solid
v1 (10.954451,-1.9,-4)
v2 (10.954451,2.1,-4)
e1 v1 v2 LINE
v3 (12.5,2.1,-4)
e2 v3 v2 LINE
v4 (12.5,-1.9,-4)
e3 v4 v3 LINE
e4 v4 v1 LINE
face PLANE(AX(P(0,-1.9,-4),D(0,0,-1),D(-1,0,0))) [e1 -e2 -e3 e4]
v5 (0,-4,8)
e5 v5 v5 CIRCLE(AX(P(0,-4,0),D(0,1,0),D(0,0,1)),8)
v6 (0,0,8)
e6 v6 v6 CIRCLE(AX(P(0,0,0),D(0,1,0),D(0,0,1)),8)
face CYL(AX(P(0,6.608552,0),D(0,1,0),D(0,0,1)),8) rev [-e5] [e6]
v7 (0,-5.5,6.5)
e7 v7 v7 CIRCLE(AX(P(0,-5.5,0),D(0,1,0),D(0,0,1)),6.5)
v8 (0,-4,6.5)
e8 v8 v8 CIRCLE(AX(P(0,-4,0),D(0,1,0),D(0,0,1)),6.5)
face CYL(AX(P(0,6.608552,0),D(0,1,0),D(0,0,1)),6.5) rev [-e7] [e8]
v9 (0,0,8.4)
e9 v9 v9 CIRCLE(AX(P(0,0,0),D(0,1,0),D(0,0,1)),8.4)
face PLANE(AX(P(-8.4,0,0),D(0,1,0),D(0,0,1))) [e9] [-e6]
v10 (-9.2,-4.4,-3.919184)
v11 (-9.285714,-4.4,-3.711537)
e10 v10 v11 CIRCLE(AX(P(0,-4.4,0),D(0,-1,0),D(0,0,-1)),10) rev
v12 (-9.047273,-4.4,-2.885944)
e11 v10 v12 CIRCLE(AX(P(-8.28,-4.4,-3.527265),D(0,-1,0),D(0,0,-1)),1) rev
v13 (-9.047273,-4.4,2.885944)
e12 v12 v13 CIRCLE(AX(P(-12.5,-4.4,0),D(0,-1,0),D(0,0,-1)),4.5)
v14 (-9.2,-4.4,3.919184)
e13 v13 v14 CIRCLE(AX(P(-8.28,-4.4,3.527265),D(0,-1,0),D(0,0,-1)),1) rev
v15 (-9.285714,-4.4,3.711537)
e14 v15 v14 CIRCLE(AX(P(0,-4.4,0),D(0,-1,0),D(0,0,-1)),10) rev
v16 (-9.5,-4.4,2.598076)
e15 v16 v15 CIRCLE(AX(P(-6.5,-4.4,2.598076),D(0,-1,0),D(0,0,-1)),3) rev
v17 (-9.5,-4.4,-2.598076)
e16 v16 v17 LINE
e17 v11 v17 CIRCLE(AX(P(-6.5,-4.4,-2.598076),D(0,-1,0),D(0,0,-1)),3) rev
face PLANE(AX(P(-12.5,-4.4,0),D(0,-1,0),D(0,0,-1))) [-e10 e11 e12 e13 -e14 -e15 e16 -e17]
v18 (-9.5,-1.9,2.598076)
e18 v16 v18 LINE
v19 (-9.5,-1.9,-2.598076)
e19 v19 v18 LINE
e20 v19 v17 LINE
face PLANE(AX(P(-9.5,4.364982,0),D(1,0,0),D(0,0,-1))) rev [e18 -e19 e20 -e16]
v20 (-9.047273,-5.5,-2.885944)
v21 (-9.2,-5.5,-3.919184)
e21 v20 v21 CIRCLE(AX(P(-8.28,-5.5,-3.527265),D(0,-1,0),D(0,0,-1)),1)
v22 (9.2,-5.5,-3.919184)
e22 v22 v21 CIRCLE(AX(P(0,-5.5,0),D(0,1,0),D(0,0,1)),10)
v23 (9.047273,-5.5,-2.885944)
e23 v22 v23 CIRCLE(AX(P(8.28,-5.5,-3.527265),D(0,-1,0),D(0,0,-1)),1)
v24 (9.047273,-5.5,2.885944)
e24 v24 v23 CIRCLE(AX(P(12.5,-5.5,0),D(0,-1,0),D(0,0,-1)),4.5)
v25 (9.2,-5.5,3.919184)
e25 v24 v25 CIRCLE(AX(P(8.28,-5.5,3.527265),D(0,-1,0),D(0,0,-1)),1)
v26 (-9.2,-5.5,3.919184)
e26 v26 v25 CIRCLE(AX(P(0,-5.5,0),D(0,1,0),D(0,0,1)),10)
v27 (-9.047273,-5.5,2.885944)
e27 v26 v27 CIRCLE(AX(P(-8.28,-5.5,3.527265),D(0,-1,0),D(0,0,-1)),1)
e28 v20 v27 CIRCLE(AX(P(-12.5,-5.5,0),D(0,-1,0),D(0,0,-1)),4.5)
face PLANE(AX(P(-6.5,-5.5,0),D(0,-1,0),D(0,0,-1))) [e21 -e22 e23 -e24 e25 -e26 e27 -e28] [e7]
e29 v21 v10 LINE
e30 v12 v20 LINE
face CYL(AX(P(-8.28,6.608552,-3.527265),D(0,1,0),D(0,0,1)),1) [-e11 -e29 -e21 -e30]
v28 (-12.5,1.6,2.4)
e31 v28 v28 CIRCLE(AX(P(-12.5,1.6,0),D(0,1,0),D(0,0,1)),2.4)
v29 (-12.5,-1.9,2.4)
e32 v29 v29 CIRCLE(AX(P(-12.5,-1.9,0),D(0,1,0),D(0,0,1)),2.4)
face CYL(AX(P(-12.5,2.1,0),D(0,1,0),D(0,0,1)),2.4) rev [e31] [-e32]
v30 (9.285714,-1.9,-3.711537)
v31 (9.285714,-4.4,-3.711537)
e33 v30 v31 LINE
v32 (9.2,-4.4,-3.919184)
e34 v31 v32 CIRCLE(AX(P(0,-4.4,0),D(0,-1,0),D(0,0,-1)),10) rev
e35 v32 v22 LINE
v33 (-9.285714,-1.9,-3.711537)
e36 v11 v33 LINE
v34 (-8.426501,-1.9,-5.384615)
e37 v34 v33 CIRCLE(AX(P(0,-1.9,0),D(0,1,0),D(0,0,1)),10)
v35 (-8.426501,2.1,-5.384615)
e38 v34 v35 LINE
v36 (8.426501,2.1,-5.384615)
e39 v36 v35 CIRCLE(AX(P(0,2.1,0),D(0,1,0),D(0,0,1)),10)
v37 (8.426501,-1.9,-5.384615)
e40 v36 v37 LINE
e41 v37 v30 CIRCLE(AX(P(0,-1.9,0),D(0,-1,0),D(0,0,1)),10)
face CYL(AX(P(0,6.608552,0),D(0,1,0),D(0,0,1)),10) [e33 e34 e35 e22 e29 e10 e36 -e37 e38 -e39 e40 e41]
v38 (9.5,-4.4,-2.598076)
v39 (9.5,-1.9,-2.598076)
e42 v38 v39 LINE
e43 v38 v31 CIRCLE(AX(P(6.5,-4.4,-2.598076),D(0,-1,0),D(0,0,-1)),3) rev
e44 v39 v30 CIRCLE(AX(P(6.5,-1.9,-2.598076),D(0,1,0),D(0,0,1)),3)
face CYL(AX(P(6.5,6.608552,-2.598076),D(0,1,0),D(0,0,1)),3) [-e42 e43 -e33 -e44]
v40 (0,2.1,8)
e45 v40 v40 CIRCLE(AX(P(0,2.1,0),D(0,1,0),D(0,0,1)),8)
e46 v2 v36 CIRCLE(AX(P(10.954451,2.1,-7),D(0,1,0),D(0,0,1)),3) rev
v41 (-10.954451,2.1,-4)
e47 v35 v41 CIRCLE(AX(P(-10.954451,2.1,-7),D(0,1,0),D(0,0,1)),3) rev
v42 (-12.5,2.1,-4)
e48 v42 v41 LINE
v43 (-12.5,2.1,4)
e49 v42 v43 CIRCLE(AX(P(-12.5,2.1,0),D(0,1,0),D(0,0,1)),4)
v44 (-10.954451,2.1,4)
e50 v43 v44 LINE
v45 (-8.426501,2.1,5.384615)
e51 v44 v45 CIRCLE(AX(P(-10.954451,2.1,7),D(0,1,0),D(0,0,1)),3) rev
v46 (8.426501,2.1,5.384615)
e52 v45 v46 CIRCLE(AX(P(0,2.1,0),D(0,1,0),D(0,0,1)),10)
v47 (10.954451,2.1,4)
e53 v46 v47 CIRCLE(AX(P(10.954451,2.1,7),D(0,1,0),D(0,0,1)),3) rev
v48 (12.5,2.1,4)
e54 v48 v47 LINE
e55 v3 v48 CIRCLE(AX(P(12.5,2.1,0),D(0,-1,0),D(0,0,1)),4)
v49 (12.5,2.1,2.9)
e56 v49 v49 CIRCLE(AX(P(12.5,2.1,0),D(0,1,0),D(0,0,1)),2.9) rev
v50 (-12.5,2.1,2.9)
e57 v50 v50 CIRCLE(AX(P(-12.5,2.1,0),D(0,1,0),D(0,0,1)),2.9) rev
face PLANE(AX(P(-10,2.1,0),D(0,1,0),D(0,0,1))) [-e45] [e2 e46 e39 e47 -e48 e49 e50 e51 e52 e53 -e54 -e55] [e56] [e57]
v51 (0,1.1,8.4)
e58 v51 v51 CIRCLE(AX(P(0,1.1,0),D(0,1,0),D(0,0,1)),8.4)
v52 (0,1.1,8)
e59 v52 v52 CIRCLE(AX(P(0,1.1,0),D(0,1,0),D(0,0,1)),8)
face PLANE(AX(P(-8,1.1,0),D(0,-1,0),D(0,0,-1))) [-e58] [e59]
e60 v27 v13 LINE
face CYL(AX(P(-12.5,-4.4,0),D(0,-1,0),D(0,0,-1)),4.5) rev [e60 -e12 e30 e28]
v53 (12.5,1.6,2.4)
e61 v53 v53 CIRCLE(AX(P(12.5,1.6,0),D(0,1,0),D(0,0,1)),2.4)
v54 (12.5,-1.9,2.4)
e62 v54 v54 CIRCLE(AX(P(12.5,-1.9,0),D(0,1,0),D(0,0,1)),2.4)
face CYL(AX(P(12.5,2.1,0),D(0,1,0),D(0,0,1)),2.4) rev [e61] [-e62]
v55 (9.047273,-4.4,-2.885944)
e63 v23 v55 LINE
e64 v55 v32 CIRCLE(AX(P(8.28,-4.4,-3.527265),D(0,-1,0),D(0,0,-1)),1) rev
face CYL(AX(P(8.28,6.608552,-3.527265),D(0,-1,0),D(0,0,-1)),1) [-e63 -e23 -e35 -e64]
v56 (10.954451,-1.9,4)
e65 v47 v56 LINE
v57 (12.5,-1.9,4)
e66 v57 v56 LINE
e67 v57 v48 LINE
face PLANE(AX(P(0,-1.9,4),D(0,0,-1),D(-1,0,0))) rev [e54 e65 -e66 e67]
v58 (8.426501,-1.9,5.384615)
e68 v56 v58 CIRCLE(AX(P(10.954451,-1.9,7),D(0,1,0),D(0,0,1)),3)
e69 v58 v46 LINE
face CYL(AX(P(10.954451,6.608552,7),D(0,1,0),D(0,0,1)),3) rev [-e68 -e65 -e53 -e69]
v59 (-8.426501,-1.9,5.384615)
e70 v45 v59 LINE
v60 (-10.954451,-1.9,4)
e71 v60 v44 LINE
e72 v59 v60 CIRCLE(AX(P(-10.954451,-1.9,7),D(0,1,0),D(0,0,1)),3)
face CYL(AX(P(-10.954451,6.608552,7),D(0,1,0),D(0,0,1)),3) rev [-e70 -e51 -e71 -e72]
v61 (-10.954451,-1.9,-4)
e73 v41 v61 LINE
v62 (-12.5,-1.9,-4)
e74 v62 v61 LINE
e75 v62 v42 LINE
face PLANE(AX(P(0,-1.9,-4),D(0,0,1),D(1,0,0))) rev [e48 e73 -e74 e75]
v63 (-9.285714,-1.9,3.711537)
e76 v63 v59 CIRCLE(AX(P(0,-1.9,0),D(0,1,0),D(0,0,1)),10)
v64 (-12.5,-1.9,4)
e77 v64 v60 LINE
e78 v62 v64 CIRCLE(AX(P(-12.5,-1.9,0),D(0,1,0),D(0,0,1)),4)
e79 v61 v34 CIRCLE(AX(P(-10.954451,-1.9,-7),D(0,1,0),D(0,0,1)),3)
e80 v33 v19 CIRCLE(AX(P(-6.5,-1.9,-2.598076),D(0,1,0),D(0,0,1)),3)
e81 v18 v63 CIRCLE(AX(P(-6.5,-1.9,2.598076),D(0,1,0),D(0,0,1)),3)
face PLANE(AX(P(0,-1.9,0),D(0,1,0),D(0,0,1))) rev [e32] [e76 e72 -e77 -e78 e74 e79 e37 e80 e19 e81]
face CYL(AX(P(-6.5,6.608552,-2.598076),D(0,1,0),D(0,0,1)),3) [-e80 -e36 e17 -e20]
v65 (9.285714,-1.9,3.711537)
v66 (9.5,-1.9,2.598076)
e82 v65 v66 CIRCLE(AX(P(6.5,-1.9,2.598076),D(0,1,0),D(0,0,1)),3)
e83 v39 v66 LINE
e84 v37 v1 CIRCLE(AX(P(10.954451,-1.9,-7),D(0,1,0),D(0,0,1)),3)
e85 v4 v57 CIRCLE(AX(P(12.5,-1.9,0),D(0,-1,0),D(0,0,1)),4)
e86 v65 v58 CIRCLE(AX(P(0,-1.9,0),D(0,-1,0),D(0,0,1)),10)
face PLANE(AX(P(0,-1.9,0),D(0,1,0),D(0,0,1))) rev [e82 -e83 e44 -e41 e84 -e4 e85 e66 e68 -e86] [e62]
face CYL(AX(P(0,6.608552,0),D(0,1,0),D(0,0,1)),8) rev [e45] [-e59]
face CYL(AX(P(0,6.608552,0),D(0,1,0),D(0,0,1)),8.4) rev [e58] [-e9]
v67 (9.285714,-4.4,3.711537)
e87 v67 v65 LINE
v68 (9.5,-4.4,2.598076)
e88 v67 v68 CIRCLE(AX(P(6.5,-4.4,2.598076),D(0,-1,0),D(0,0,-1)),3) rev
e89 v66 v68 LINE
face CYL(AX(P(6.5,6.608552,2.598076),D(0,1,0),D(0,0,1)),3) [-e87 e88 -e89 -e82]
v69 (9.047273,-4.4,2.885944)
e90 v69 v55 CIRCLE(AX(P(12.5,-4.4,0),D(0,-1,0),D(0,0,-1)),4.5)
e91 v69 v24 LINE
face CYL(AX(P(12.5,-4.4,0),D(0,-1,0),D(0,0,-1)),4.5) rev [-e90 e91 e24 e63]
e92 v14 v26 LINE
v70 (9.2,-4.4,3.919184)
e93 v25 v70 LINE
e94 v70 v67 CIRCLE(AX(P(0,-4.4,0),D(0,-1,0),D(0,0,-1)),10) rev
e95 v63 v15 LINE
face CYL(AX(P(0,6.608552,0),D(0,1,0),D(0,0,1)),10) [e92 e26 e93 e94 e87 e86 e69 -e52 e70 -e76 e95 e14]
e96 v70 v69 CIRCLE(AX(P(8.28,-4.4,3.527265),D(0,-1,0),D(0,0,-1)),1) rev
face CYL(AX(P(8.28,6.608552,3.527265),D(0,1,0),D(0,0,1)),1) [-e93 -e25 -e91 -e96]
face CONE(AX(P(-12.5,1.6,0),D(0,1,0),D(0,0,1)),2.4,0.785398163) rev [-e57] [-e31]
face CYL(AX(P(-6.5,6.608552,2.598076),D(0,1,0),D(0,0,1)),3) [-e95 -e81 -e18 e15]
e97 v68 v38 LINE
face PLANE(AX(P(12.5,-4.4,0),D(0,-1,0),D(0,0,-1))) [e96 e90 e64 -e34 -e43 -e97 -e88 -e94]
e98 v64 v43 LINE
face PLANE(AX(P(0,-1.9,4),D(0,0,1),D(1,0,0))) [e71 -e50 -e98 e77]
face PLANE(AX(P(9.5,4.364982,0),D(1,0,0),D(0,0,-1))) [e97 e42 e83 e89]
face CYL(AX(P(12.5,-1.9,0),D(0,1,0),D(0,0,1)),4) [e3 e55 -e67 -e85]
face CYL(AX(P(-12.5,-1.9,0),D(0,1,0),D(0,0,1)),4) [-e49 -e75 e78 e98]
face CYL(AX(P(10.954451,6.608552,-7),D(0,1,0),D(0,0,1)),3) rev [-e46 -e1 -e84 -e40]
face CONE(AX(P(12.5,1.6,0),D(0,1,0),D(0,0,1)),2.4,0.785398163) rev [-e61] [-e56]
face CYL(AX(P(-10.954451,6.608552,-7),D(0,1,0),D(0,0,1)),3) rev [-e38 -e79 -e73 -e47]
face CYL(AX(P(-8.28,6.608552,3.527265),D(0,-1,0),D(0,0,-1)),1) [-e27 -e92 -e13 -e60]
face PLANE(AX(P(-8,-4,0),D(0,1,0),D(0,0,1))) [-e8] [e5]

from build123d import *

# Parameters (mm, degrees)
BOSS_EXTRU_1_DEPTH             = 4
ENL_V_START                    = -4
ENL_V_MAT_EXTRU_3_DEPTH        = 3.6
CONG_2_R                       = 3
CONG_3_R                       = 3
CONG_2_OF_SYM_TRIE1_R          = 3
CONG_3_OF_SYM_TRIE1_R          = 3
F_4_8_4_8_DIAMETER_HOLE2_D     = 4.8
F_4_8_4_8_DIAMETER_HOLE2_DEPTH = 6.4
F_4_8_4_8_DIAMETER_HOLE2_TIP   = 1.442065486
CHANFREIN1_SIZE                = 0.5
ESQUISSE9_R                    = 4.5
ENL_V_MAT_EXTRU_4_DEPTH        = 1.1
CONG_4_R                       = 1


with BuildPart() as part:
    # Esquisse1 → Révolution1 (revolve)
    with BuildSketch(Plane.XY, mode=Mode.PRIVATE) as r_volution1_sk:
        Polygon((-6.5, -4), (-6.5, -5.5), (-10, -5.5), (-10, 2.1), (-8, 2.1), (-8, 1.1), (-8.4, 1.1), (-8.4, 0), (-8, 0), (-8, -4), align=None)
    revolve(r_volution1_sk.sketch.rotate(Axis((0, 6.608552154, 0), (0, -1, 0)), 270), axis=Axis((0, 6.608552154, 0), (0, -1, 0)))

    # Esquisse2 → Boss.-Extru.1 (add)
    with BuildSketch(Plane(origin=(0, 2.1, 0), x_dir=(1, 0, 0), z_dir=(0, 1, 0))):
        with BuildLine():
            Line((-12.5, -4), (-9.16515139, -4))
            ThreePointArc((-9.16515139, -4), (-10, 0), (-9.16515139, 4))
            Line((-9.16515139, 4), (-12.5, 4))
            ThreePointArc((-12.5, 4), (-16.5, 0), (-12.5, -4))
        make_face()
    boss_extru_1 = extrude(amount=-BOSS_EXTRU_1_DEPTH)

    # Esquisse2<6> → Enlèv. mat.-Extru.3 (cut)
    with BuildSketch(Plane(origin=(0, 2.1, 0), x_dir=(1, 0, 0), z_dir=(0, 1, 0)).offset(ENL_V_START)):
        with BuildLine():
            ThreePointArc((-9.5, 3.122498999), (-10, 0), (-9.5, -3.122498999))
            Line((-9.5, -3.122498999), (-9.5, 3.122498999))
        make_face()
    enl_v_mat_extru_3 = extrude(amount=-ENL_V_MAT_EXTRU_3_DEPTH, mode=Mode.SUBTRACT)

    # Congé2
    cong_2_edges = [part.edges().sort_by_distance(p)[0] for p in [
        (-9.5, -3.7, 3.122498999),
        (-9.5, -3.7, -3.122498999),
    ]]
    fillet(cong_2_edges, radius=CONG_2_R)

    # Congé3
    cong_3_edges = [part.edges().sort_by_distance(p)[0] for p in [
        (-9.16515139, 0.1, -4),
        (-9.16515139, 0.1, 4),
    ]]
    fillet(cong_3_edges, radius=CONG_3_R)

    # Symétrie1: Boss.-Extru.1, Enlèv. mat.-Extru.3 across plane
    add(boss_extru_1.mirror(Plane(origin=(0, 0, 0), x_dir=(0, 0, 1), z_dir=(1, 0, 0))))
    add(enl_v_mat_extru_3.mirror(Plane(origin=(0, 0, 0), x_dir=(0, 0, 1), z_dir=(1, 0, 0))), mode=Mode.SUBTRACT)

    # Congé2 of Symétrie1
    cong_2_of_sym_trie1_edges = [part.edges().sort_by_distance(p)[0] for p in [
        (9.5, -3.7, 3.122498999),
        (9.5, -3.7, -3.122498999),
    ]]
    fillet(cong_2_of_sym_trie1_edges, radius=CONG_2_OF_SYM_TRIE1_R)

    # Congé3 of Symétrie1
    cong_3_of_sym_trie1_edges = [part.edges().sort_by_distance(p)[0] for p in [
        (9.16515139, 0.1, -4),
        (9.16515139, 0.1, 4),
    ]]
    fillet(cong_3_of_sym_trie1_edges, radius=CONG_3_OF_SYM_TRIE1_R)

    # Ø4.8 (4.8) Diameter Hole2
    with Locations(Plane(origin=(0, 2.1, 0), x_dir=(1, 0, 0), z_dir=(0, 1, 0))):
        with Locations((-12.5, 0), (12.5, 0)):
            Hole(F_4_8_4_8_DIAMETER_HOLE2_D / 2, depth=F_4_8_4_8_DIAMETER_HOLE2_DEPTH)
            with Locations((0, 0, -(F_4_8_4_8_DIAMETER_HOLE2_DEPTH + F_4_8_4_8_DIAMETER_HOLE2_TIP / 2))):  # 118° drill point
                Cone(0, F_4_8_4_8_DIAMETER_HOLE2_D / 2, F_4_8_4_8_DIAMETER_HOLE2_TIP, mode=Mode.SUBTRACT)

    # Chanfrein1
    chanfrein1_edges = [part.edges().sort_by_distance(p)[0] for p in [
        (14.9, 2.1, 0),
        (-10.1, 2.1, 0),
    ]]
    chamfer(chanfrein1_edges, length=CHANFREIN1_SIZE)

    # Esquisse9 → Enlèv. mat.-Extru.4 (cut)
    with BuildSketch(Plane.XZ.offset(5.5)):
        with Locations((-12.5, 0)):
            Circle(ESQUISSE9_R)
        with Locations((12.5, 0)):
            Circle(ESQUISSE9_R)
    extrude(amount=-ENL_V_MAT_EXTRU_4_DEPTH, mode=Mode.SUBTRACT)

    # Congé4
    # the kernel refuses this fillet: 1 mm, written as the material it takes off along each edge
    with BuildSketch(Plane(origin=(9.421052632, -4.4, 3.281780477), x_dir=(-0.686560042836171, 0, -0.7270731102033653), z_dir=(0, -1, 0))) as cong_4_piece_1:
        with BuildLine():
            CenterArc((0.604915781, -0.998168708), CONG_4_R, 93.468029374, 62.964308211)
            Line((-0.311672758, -0.598336932), (-0.403331612, -0.558353754))
            ThreePointArc((-0.403331612, -0.558353754), (-0.310284429, -0.351422835), (-0.083419367, 0.05514716))
            Line((-0.083419367, 0.05514716), (0.006049158, 0.099816871))
            ThreePointArc((0.006049158, 0.099816871), (0.272212102, 0.091759185), (0.538375045, 0.099816871))
            Line((0.538375045, 0.099816871), (0.544424203, 0))
        make_face()
    extrude(amount=2.786614567, mode=Mode.SUBTRACT)
    with BuildSketch(Plane(origin=(9.421052632, -4.4, -3.281780477), x_dir=(-0.6865600428361709, 0, 0.7270731102033654), z_dir=(0, -1, 0)), Plane(origin=(-9.421052632, -4.4, 3.281780477), x_dir=(0.6865600428361707, 0, -0.7270731102033658), z_dir=(0, -1, 0))) as cong_4_piece_2:
        with BuildLine():
            CenterArc((0.604915781, 0.998168708), CONG_4_R, 203.567662416, 62.964308211)
            Line((-0.311672758, 0.598336932), (-0.403331612, 0.558353754))
            ThreePointArc((-0.403331612, 0.558353754), (-0.310284429, 0.351422835), (-0.083419367, -0.05514716))
            Line((-0.083419367, -0.05514716), (0.006049158, -0.099816871))
            ThreePointArc((0.006049158, -0.099816871), (0.272212102, -0.091759185), (0.538375045, -0.099816871))
            Line((0.538375045, -0.099816871), (0.544424203, 0))
        make_face()
    extrude(amount=2.786614567, mode=Mode.SUBTRACT)
    with BuildSketch(Plane(origin=(-9.421052632, -4.4, -3.281780477), x_dir=(0.3276573021844398, 0, -0.9447966407249841), z_dir=(0, -1, 0))) as cong_4_piece_3:
        with BuildLine():
            CenterArc((0.605807396, 0.997627822), CONG_4_R, 210.982965052, 62.964308211)
            Line((-0.251512996, 0.482844619), (-0.337245035, 0.431366299))
            ThreePointArc((-0.337245035, 0.431366299), (-0.207136841, 0.199031418), (-0.091321217, -0.04074844))
            Line((-0.091321217, -0.04074844), (-0.010371424, -0.099460714))
            ThreePointArc((-0.010371424, -0.099460714), (0.455018696, -0.112838034), (0.68152967, -0.099762782))
            Line((0.68152967, -0.099762782), (0.674645827, 0))
        make_face()
    extrude(amount=2.786614567, mode=Mode.SUBTRACT)


solid = part.part
